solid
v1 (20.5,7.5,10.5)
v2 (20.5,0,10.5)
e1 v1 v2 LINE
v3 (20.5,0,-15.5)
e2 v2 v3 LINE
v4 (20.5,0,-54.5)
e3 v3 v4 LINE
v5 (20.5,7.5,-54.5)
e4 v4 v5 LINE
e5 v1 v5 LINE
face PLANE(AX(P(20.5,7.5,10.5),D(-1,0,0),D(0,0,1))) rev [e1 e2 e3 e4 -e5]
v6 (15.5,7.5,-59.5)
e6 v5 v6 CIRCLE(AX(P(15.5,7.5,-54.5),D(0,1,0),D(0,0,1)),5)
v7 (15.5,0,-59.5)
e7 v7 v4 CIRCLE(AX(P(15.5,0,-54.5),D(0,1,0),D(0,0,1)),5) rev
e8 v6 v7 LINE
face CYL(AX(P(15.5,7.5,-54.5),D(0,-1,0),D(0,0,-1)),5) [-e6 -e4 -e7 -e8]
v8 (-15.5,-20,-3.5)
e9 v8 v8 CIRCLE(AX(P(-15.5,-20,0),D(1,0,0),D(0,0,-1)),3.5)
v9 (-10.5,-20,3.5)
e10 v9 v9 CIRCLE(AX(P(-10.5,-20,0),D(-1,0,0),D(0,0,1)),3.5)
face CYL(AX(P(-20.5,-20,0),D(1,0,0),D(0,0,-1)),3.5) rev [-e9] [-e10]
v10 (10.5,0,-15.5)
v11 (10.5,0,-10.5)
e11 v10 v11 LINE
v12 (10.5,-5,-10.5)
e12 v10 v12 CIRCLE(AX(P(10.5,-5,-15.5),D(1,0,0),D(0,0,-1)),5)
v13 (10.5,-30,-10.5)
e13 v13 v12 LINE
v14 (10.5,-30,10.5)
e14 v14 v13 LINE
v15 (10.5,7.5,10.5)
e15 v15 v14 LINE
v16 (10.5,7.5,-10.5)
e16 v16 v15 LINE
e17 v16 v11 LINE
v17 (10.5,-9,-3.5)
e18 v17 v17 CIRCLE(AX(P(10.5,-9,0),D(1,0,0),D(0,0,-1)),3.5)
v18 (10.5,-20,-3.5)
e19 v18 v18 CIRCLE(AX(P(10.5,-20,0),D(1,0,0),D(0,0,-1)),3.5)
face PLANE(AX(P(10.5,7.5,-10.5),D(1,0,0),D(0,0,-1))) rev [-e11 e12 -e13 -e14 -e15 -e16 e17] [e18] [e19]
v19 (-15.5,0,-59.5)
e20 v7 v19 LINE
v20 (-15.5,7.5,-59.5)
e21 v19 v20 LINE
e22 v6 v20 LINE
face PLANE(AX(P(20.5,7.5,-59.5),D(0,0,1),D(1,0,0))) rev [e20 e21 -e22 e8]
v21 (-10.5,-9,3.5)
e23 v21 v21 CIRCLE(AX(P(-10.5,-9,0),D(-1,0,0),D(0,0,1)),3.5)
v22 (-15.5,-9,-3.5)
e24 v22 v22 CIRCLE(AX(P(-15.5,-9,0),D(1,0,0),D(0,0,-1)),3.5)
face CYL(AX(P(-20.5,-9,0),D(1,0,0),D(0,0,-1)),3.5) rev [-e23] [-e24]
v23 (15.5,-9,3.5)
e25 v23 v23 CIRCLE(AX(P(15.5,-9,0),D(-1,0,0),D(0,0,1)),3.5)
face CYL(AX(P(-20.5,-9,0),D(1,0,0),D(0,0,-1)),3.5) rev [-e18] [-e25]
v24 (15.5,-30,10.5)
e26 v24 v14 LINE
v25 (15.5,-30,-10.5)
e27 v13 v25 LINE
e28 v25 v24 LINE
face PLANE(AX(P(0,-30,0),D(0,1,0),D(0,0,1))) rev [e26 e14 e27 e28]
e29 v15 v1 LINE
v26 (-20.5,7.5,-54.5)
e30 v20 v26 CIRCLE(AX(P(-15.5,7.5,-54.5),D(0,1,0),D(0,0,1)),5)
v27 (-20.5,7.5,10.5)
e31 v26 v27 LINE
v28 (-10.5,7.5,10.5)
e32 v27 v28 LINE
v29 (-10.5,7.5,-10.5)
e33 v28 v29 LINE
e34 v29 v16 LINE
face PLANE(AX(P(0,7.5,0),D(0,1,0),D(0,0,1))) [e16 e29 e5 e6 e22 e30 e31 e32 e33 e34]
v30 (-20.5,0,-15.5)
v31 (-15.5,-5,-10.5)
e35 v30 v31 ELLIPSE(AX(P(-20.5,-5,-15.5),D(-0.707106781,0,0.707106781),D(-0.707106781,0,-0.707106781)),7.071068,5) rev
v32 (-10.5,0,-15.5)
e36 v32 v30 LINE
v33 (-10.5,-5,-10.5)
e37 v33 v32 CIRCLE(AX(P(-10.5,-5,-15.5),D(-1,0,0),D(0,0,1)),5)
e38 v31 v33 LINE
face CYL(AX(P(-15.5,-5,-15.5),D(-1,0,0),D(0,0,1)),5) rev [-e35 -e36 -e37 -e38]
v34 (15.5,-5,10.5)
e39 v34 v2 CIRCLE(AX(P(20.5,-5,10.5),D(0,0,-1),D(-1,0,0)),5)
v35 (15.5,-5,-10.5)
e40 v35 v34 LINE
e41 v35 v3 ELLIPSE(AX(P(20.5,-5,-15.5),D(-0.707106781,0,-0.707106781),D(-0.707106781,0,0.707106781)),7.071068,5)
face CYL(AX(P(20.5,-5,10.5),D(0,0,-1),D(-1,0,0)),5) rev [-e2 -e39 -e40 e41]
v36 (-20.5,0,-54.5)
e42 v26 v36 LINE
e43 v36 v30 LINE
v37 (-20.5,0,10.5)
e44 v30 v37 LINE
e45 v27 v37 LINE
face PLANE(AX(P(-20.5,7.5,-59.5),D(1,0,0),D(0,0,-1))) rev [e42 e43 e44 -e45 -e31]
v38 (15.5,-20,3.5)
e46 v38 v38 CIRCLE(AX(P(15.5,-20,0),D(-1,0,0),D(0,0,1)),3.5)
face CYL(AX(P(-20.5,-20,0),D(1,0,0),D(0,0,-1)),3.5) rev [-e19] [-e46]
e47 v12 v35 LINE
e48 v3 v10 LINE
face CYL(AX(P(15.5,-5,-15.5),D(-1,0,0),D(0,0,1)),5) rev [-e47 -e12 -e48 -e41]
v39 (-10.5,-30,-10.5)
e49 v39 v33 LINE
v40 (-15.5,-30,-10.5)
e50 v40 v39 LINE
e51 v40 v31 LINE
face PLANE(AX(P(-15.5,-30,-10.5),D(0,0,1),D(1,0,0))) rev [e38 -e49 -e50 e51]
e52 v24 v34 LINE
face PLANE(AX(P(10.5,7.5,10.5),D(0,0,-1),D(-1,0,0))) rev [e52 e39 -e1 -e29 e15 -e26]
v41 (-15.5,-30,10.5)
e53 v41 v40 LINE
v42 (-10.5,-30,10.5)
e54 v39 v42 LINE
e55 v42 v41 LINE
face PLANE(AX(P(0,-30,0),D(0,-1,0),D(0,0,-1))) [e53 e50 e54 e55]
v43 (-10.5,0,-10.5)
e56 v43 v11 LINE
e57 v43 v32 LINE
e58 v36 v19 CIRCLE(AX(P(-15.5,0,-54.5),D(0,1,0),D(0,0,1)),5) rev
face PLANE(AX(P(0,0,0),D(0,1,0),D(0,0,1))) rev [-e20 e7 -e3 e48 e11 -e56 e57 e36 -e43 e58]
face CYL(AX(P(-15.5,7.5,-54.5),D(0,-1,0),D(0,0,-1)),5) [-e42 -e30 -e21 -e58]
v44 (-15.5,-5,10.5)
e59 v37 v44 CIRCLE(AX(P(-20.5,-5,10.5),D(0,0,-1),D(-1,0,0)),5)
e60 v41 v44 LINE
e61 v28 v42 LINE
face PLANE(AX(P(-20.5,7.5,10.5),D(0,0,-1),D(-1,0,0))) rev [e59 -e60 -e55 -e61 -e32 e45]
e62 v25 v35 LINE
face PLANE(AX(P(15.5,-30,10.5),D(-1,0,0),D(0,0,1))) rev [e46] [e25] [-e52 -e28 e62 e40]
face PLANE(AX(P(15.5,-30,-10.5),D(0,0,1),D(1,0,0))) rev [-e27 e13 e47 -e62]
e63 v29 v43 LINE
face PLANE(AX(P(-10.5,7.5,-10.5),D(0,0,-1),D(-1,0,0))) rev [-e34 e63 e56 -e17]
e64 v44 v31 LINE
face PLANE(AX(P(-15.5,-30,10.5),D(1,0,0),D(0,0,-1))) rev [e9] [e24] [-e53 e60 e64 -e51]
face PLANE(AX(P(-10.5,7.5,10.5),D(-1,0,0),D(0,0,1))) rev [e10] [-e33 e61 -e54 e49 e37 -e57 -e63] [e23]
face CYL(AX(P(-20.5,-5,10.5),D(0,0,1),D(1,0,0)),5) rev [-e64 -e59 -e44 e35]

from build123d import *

# Parameters (mm, degrees)
BOSS_EXTRUDE1_DEPTH = 7.5
SKETCH2_W           = 5
SKETCH2_H           = 21
BOSS_EXTRUDE2_DEPTH = 30
SKETCH3_R           = 3.5
CUT_EXTRUDE1_DEPTH  = 79.238417673
FILLET1_R           = 5


with BuildPart() as part:
    # Sketch1 → Boss-Extrude1 (new body)
    with BuildSketch(Plane(origin=(0, 0, 0), x_dir=(1, 0, 0), z_dir=(0, 1, 0))):
        Polygon((-20.5, -10.5), (-10.5, -10.5), (-10.5, 10.5), (10.5, 10.5), (10.5, -10.5), (20.5, -10.5), (20.5, 59.5), (-20.5, 59.5), align=None)
    extrude(amount=BOSS_EXTRUDE1_DEPTH)

    # Sketch2 → Boss-Extrude2 (add)
    with BuildSketch(Plane.XZ):
        with Locations((-13, 0)):
            Rectangle(SKETCH2_W, SKETCH2_H)
        with Locations((13, 0)):
            Rectangle(SKETCH2_W, SKETCH2_H)
    extrude(amount=BOSS_EXTRUDE2_DEPTH)

    # Sketch3 → Cut-Extrude1 (cut, through all)
    with BuildSketch(Plane(origin=(20.5, 0, 0), x_dir=(0, 0, -1), z_dir=(1, 0, 0))):
        with Locations((0, -9)):
            Circle(SKETCH3_R)
        with Locations((0, -20)):
            Circle(SKETCH3_R)
    extrude(amount=-CUT_EXTRUDE1_DEPTH, mode=Mode.SUBTRACT)

    # Fillet1
    fillet1_edges = [part.edges().sort_by_distance(p)[0] for p in [
        (-13, 0, -10.5),
        (13, 0, -10.5),
        (-15.5, 0, 0),
        (15.5, 0, 0),
    ]]
    fillet(fillet1_edges, radius=FILLET1_R - 0.0001)  # a hair under: the kernel refuses the full size
    fillet1_2_edges = [part.edges().sort_by_distance(p)[0] for p in [
        (-20.5, 3.75, -59.5),
        (20.5, 3.75, -59.5),
    ]]
    fillet(fillet1_2_edges, radius=FILLET1_R)


solid = part.part
